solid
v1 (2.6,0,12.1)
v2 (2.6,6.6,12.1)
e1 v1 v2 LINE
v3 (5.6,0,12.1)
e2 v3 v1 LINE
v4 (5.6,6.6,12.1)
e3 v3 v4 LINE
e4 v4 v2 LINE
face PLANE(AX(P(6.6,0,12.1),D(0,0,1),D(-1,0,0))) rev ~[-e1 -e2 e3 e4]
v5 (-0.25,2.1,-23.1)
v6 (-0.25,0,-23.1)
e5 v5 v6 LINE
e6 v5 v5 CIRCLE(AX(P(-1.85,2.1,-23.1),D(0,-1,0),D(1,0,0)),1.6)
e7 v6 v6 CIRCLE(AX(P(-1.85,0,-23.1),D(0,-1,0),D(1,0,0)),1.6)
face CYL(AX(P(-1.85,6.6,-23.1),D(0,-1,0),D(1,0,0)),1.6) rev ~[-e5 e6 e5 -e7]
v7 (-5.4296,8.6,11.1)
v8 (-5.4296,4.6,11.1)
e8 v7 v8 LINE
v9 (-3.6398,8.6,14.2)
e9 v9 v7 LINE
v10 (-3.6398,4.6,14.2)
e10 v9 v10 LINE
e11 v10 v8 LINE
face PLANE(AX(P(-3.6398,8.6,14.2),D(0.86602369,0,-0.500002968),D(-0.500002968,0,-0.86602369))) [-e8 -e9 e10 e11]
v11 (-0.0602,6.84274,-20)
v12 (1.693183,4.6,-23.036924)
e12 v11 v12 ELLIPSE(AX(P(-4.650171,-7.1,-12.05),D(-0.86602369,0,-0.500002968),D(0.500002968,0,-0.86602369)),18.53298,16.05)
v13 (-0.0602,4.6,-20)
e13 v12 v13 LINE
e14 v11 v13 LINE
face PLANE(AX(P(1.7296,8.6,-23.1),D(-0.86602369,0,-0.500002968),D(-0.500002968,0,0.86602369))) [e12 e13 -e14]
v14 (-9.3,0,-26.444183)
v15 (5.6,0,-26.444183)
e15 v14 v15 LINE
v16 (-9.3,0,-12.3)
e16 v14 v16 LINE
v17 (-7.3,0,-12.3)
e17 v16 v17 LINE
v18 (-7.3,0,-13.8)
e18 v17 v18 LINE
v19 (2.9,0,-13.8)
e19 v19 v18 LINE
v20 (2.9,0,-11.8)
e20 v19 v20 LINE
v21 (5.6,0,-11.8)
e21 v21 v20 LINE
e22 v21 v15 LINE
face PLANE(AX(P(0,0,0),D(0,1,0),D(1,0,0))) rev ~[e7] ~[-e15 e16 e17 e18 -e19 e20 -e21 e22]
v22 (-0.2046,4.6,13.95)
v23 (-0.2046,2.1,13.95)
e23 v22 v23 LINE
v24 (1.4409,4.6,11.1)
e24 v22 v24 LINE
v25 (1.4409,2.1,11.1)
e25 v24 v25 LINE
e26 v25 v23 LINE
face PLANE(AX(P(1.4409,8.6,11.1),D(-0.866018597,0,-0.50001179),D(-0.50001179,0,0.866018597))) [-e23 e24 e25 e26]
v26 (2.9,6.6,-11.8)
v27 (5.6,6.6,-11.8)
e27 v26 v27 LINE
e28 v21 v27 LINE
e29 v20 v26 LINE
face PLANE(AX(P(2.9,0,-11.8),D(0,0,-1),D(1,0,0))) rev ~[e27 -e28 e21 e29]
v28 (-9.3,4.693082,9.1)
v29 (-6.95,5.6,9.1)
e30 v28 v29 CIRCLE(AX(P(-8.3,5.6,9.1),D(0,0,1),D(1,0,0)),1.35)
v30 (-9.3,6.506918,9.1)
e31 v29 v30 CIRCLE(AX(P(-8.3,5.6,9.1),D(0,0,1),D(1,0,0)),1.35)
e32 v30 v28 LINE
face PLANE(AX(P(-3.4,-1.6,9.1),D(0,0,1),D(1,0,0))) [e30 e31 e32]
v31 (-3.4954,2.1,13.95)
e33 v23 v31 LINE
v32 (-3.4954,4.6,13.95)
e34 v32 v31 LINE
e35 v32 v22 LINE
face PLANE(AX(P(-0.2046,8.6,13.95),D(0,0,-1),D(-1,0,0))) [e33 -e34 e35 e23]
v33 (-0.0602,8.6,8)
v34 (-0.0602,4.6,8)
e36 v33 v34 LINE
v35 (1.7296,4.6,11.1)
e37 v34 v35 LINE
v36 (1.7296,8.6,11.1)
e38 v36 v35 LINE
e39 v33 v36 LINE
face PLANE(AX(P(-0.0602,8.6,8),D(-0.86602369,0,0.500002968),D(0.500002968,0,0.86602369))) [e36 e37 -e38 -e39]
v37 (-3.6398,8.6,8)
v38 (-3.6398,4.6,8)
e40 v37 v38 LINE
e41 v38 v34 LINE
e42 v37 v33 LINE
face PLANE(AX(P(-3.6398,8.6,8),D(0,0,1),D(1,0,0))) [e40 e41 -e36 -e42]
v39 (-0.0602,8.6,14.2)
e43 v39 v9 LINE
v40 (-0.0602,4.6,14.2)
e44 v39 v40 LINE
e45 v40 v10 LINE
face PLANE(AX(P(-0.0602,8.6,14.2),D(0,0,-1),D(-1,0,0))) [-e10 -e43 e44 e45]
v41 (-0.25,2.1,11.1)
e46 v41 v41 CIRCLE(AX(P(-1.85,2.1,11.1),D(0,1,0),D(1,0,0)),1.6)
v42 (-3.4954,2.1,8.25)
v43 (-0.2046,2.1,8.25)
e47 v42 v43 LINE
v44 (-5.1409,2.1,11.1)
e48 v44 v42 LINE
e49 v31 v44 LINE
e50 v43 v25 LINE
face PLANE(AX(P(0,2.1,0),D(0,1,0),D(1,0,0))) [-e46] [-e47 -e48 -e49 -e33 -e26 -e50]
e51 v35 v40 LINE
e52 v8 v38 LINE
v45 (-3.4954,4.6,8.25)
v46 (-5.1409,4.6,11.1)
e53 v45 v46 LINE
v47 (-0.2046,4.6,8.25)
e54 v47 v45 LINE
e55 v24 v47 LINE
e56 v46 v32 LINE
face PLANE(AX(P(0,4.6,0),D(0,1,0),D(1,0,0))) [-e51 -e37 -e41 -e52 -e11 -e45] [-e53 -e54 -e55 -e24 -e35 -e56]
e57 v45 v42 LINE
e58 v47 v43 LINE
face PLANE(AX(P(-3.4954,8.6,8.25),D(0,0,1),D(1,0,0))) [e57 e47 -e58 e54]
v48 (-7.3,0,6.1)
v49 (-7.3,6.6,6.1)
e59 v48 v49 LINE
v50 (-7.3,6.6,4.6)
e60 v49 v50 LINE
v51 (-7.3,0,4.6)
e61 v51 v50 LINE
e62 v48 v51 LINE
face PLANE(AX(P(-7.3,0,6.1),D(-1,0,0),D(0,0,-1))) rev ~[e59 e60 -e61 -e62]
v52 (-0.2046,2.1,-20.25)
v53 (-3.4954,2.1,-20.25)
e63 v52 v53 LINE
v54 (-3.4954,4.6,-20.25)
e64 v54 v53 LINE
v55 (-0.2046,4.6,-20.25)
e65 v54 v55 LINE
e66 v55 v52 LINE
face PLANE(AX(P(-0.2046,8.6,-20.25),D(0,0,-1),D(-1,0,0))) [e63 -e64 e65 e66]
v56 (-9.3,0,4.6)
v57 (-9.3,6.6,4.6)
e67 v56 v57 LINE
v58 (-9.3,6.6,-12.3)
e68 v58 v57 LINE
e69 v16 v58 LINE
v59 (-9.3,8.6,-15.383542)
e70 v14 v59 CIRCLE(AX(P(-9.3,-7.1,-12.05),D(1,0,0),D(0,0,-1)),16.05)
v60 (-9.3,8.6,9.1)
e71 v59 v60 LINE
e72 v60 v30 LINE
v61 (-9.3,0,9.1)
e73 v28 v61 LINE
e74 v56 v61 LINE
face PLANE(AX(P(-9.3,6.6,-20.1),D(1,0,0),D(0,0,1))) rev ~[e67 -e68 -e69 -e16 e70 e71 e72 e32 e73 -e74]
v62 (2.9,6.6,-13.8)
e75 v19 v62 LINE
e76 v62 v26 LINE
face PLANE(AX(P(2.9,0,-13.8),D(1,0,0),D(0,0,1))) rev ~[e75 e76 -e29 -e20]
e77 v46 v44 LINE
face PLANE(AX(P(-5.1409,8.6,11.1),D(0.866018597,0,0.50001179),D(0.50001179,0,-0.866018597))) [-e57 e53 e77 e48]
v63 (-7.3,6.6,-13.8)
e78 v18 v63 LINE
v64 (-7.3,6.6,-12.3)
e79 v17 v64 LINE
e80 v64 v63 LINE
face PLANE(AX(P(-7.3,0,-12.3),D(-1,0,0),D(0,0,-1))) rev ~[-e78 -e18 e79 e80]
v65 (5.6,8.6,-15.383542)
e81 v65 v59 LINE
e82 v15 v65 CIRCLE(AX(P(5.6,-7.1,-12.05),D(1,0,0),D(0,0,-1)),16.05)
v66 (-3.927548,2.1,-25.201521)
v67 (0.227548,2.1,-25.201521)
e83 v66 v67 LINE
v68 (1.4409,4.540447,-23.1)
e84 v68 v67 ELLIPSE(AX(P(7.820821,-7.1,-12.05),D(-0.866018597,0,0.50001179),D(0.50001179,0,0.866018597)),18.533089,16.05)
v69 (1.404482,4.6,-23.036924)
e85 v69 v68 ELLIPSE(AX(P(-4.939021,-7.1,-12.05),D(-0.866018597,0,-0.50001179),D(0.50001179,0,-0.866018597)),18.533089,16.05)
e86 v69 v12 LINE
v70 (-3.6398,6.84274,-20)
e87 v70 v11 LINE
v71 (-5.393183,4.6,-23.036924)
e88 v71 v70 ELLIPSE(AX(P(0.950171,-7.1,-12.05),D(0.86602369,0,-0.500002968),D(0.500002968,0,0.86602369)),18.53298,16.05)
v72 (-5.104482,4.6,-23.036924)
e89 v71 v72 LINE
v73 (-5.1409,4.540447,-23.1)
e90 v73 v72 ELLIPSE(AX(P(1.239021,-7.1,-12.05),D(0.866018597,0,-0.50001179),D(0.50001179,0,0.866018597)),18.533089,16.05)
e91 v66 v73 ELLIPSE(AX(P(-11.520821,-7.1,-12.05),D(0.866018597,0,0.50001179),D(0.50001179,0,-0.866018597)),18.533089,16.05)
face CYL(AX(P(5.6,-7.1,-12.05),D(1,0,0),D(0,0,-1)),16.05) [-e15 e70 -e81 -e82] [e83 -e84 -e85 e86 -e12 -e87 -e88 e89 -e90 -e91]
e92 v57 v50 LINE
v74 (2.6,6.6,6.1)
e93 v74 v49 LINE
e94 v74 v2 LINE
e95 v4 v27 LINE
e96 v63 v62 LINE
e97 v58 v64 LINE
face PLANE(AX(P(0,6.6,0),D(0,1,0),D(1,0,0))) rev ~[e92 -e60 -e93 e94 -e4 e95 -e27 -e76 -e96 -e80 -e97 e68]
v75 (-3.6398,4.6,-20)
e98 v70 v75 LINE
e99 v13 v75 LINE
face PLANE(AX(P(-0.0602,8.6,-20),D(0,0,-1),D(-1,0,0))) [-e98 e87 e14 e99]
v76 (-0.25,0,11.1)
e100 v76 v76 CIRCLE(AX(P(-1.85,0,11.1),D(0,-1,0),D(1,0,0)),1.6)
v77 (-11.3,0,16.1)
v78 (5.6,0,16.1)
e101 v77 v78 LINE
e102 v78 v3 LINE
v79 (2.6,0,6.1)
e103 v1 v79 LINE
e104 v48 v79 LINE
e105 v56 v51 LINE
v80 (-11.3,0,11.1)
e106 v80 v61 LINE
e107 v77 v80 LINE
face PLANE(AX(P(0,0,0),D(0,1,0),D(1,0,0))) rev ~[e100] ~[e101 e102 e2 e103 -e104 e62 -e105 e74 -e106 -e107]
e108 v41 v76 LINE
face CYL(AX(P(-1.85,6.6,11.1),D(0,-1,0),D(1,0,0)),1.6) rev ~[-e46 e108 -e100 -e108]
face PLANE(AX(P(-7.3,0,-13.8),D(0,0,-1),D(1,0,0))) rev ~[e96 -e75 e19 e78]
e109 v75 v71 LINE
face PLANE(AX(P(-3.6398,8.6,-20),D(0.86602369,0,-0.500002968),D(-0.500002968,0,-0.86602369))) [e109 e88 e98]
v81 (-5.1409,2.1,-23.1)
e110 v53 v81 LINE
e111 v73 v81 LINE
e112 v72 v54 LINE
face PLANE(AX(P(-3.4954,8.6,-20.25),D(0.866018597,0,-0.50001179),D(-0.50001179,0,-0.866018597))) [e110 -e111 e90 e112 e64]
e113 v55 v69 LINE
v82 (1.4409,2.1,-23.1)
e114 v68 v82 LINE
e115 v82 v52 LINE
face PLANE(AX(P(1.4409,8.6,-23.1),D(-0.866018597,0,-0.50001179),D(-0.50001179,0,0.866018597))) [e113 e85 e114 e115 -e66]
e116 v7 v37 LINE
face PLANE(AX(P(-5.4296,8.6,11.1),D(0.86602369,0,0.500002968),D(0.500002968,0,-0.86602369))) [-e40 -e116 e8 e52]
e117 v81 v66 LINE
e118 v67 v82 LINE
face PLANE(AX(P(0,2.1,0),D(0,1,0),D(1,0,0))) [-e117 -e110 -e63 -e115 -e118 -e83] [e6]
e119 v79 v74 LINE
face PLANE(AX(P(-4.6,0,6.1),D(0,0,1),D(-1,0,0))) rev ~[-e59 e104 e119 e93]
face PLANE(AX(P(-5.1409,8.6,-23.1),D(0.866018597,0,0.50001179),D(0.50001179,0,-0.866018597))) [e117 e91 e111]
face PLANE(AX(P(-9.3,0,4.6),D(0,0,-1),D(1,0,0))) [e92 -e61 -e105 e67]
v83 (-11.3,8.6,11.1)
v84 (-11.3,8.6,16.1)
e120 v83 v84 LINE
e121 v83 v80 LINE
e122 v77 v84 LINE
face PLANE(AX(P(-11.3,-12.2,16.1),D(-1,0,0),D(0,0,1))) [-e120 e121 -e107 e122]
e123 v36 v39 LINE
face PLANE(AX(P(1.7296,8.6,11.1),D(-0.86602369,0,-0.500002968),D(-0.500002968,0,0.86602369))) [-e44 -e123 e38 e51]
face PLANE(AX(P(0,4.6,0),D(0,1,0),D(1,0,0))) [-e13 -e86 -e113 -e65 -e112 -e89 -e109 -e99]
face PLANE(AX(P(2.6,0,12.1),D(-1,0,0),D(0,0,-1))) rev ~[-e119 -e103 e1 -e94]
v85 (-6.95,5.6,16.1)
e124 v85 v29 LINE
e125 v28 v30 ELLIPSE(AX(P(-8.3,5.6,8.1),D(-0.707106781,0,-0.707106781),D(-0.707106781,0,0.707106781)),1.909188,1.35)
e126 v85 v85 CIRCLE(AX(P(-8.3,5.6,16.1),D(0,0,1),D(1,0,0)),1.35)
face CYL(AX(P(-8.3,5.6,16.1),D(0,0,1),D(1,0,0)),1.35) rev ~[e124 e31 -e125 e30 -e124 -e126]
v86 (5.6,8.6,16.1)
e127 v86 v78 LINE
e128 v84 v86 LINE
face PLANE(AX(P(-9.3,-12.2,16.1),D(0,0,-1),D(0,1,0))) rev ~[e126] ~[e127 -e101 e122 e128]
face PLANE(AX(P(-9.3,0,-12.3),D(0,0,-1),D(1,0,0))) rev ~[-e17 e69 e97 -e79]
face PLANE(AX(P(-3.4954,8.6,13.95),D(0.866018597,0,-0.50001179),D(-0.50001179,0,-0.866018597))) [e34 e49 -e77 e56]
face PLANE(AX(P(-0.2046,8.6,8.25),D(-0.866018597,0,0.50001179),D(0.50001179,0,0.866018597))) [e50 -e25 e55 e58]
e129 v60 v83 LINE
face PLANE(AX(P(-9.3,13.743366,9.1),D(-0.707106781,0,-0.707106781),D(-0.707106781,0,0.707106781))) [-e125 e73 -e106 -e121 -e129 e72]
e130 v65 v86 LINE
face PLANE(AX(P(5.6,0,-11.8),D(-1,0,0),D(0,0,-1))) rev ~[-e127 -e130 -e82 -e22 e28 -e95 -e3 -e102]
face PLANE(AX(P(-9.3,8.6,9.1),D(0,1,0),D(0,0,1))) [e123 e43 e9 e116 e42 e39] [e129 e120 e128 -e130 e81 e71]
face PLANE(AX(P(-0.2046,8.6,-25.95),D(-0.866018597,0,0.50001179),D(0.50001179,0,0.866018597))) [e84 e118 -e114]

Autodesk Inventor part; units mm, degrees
ref_plane "YZ Plane" through (0, 0, 0) normal (1, 0, 0) x (0, 1, 0)
ref_plane "XZ Plane" through (0, 0, 0) normal (0, 1, 0) x (-1, 0, 0)
sketch "スケッチ1" plane through (0, 0, 0) normal (0, 1, 0) x (-1, 0, 0)
  line L0 (4.5, 6) -> (-4.5, 6) construction
  line L1 (-4.5, 6) -> (-4.5, -18) construction
  line L2 (-4.5, -18) -> (4.5, -18) construction
  line L3 (4.5, -18) -> (4.5, 6) construction
  line L4 (4.5, -6) -> (-4.5, -6)
  line L5 (0, -25.74) -> (0, 13.74) projected
  line L6 (0.5, -18) -> (0.5, -6) construction
  line L7 (4.6, -18.1) -> (-4.6, -18.1)
  line L8 (-4.6, -18.1) -> (-4.6, 6.1)
  line L9 (-4.6, 6.1) -> (4.6, 6.1)
  line L10 (4.6, 6.1) -> (4.6, -18.1)
  line L11 (0.4, -18.1) -> (0.4, -6)
  line L12 (-4.5, -6) -> (-4.6, -6)
  line L13 (4.5, -6) -> (4.6, -6)
  line L14 (6.6, -20.1) -> (-6.6, -20.1)
  line L15 (-6.6, -20.1) -> (-6.6, 8.1)
  line L16 (-6.6, 8.1) -> (6.6, 8.1)
  line L17 (6.6, 8.1) -> (6.6, -20.1)
  line L18 (0.4, -18.1) -> (-14.8, -18.1)
  line L19 (-14.8, -18.1) -> (-14.8, -6)
  line L20 (-14.8, -6) -> (0.4, -6)
  line L21 (0.4, -6) -> (0.4, -18.1)
  line L22 (-6.6, -20.1) -> (-14.8, -20.1)
  line L23 (-14.8, -20.1) -> (-14.8, -18.1)
  point P0 (0, 0)
  point P1 (0, -6)
  point P2 (-6.6, -6)
  point P3 (0, -20.1)
  point P4 (-6.6, -6)
  dimension "d0" = 6
  dimension "d1" = 12
  dimension "d2" = 12
  dimension "d3" = 9
  dimension "d4" = 4
  dimension "d5" = 0.1
  dimension "d6" = 0.1
  dimension "d7" = 0.1
  dimension "d8" = 0.1
  dimension "d9" = 0.1
  dimension "d10" = 2
  dimension "d11" = 2
  dimension "d12" = 15.2
extrude "押し出し1" add sketch "スケッチ1" against normal blind 2
extrude "押し出し2" add sketch "スケッチ1" against normal blind 12.2 contours L13 L10 L7 L11 L4 | L11 L7 L5 L4 | L10 L9 L5 L16 L17 L14 L7 | L5 L7 L8 L12 L4 | L5 L14 L15 L18 L7 | L9 L8 L20 L15 L16 L5 | L8 L18 L15 L20 | L15 L18 L19 L20 | L22 L23 L18 L15
sketch "スケッチ2" plane through (14.8, 0, -6) normal (1, 0, 0) x (0, 0, -1)
  line L0 (0, 0) -> (0, -12.2) projected
  line L1 (0, -2) -> (14.1, -2)
  line L2 (14.1, 0) -> (14.1, -12.2) projected
  line L3 (0, 0) -> (14.1, 0) projected
  circle A0 centre (6.05, -7.1) radius 6.05
  line L4 (0, 0) -> (0, -12.2) projected
  line L5 (0, 0) -> (14.1, 0) projected
  line L6 (0, 0) -> (0, -12.2) projected
  line L7 (14.1, -12.2) -> (0, -12.2) projected
  line L8 (14.1, 0) -> (14.1, -12.2) projected
  line L9 (12.1, 0) -> (12.1, -12.2)
  point P0 (-6, 0)
  point P1 (14.1, -7.1)
  point P2 (9.3046, -2)
  point P3 (2.7954, -2)
  point P4 (0, -7.1)
  point P5 (2.7954, -12.2)
  point P6 (9.3046, -12.2)
  point P7 (0, -7.1)
  point P8 (12.1, -7.1)
  dimension "d17" = 2
  dimension "d18" = 5.1
  dimension "d21" = 2
extrude "押し出し3" cut sketch "スケッチ2" against normal blind 15.2 contours A0 L7 L0 | A0 L1 L7 | L9 L7 A0
sketch "スケッチ3" plane through (6.6, 0, 8.1) normal (1, 0, 0) x (0, 0, -1)
  circle A0 centre (8.1, -7.1) radius 3
  line L0 (14.1, -12.2) -> (0, -12.2) projected
  line L1 (5.1, -12.2) -> (11.1, -12.2)
  line L2 (11.1, -12.2) -> (11.1, -7.1)
  line L3 (11.1, -7.1) -> (5.1, -7.1)
  line L4 (5.1, -7.1) -> (5.1, -12.2)
  point P0 (8.1, 0)
  dimension "d22" = 6
  dimension "d23" = 7.1
extrude "押し出し4" cut sketch "スケッチ3" against normal up to surface (2 mm away)
fillet "フィレット1" radius 0.5 2 edges at (10.7, -7.1, -6) (2.1, -7.1, -6)
sketch "スケッチ4" plane through (-0.4, 0, -6) normal (1, 0, 0) x (0, 0, -1)
  line L0 (-14.1, -12.2) -> (14.1, -12.2) projected
  line L1 (0, -12.2) -> (12.1, -12.2)
  line L2 (12.1, -12.2) -> (12.1, -2)
  line L3 (12.1, -2) -> (0, -2)
  line L4 (0, -2) -> (0, -12.2)
  line L5 (12.1, -7.1) -> (12.1, -12.2) projected
  line L6 (2.7954, -2) -> (9.3046, -2) projected
  point P0 (-6, 0)
extrude "押し出し5" cut sketch "スケッチ4" against normal up to surface (4.2 mm away)
ref_plane "作業平面1" through (-3.6, -12.2, 6.1) normal (1, 0, 0) x (0, 0, -1)
sketch "スケッチ5" plane through (-3.6, -12.2, 6.1) normal (1, 0, 0) x (0, 0, -1)
  line L0 (0, 10.2) -> (7.1, 10.2)
  line L1 (7.1, 10.2) -> (7.1, 5.2)
  line L2 (7.1, 5.2) -> (0, 5.2)
  line L3 (0, 5.2) -> (0, 10.2)
  line L4 (9.1, 0) -> (9.1, 5.1) projected
  point P0 (6.1, 12.2)
  dimension "d30" = 5
  dimension "d34" = 2
extrude "押し出し6" add sketch "スケッチ5" along normal blind 1.5
fillet "フィレット2" radius 3 2 edges at (-2.85, -7, -1) (-2.85, -7, 6.1)
sketch "スケッチ6" plane through (0, 0, 0) normal (0, 1, 0) x (1, 0, 0)
  line L0 (-6.6, -8.1) -> (6.6, -8.1) projected
  line L1 (5.6, -8.1) -> (2.6, -8.1)
  line L2 (2.6, -8.1) -> (2.6, -0.1)
  line L3 (2.6, -0.1) -> (5.6, -0.1)
  line L4 (5.6, -0.1) -> (5.6, -8.1)
  line L5 (6.6, -8.1) -> (6.6, 6) projected
  line L6 (-9.3, -8.1) -> (-7.3, -8.1)
  line L7 (-7.3, -8.1) -> (-7.3, 13.8)
  line L8 (-7.3, 13.8) -> (-9.3, 13.8)
  line L9 (-9.3, 13.8) -> (-9.3, -8.1)
  line L10 (-4.6, -6.1) -> (4.6, -6.1) projected
  line L11 (-7.3, -8.1) -> (2.6, -8.1)
  line L12 (2.6, -8.1) -> (2.6, -6.1)
  line L13 (2.6, -6.1) -> (-7.3, -6.1)
  line L14 (-7.3, -6.1) -> (-7.3, -8.1)
  line L15 (-9.3, 13.8) -> (2.9, 13.8)
  line L16 (2.9, 13.8) -> (2.9, 15.8)
  line L17 (2.9, 15.8) -> (-9.3, 15.8)
  line L18 (-9.3, 15.8) -> (-9.3, 13.8)
  line L19 (-9.3, 12.3) -> (-7.3, 12.3)
  line L20 (-9.3, -4.6) -> (-7.3, -4.6)
  line L21 (-7.3, -1.4667) -> (-9.3, -1.4667)
  line L22 (-9.3, -1.4667) -> (-9.3, 1.5333)
  line L23 (-9.3, 1.5333) -> (-7.3, 1.5333)
  line L24 (-7.3, 1.5333) -> (-7.3, -1.4667)
  line L25 (-7.3, 6.1667) -> (-9.3, 6.1667)
  line L26 (-9.3, 6.1667) -> (-9.3, 9.1667)
  line L27 (-9.3, 9.1667) -> (-7.3, 9.1667)
  line L28 (-7.3, 9.1667) -> (-7.3, 6.1667)
  circle A0 centre (-4.5, 8.6) radius 1
  circle A1 centre (-4.5, -0.9) radius 1
  line L29 (-9.3, 3.85) -> (-0.8107, 3.85)
  line L30 (2.9, 15.8) -> (-9.3, 15.8)
  line L31 (-9.3, 15.8) -> (-9.3, 20.1)
  line L32 (-9.3, 20.1) -> (2.9, 20.1)
  line L33 (2.9, 20.1) -> (2.9, 15.8)
  line L34 (14.8, 20.1) -> (-6.6, 20.1) projected
  point P0 (0, 0)
  point P1 (-9.3, 6.1667)
  point P2 (-7.3, 3.85)
  point P3 (2.6, -8.1)
  point P4 (2.6, -8.1)
  dimension "d35" = 4
  dimension "d36" = 8
  dimension "d37" = 3
  dimension "d40" = 9.9
  dimension "d41" = 2
  dimension "d42" = 19.9
  dimension "d43" = 2
  dimension "d44" = 10.2
  dimension "d45" = 1.5
  dimension "d46" = 1.5
  dimension "d53" = 3
  dimension "d54" = 3
  dimension "d55" = 4.6333
  dimension "d56" = 4.6333
  dimension "d57" = 4.6333
  dimension "d60" = 2
  dimension "d61" = 2
  dimension "d62" = 7.1
  dimension "d63" = 9.5
extrude "押し出し7" add sketch "スケッチ6" along normal blind 6.6 contours L11 L7 L13 L10 L2 L0 | L2 L3 L4 L0 | L6 L9 L20 L7 | L9 L23 L7 L21 | L9 L27 L7 L25 | L9 L8 L7 L19 | L18 L17 L16 L15 L8 | L31 L32 L33 L17 | A0 | A1
chamfer "面取り1" distance 6 distance2 2 1 edges at (5.6, 3.3, 0.1) measured on face at (5.6, 2.2, 5.4333)
sketch "スケッチ7" plane through (-6.6, -12.2, -20.1) normal (-1, 0, 0) x (0, 0, 1)
  line L0 (0, 12.2) -> (0, 0) projected
  line L1 (28.2, 0) -> (0, 0) projected
  line L2 (28.2, 12.2) -> (28.2, 0) projected
  line L3 (26.2, 12.2) -> (28.2, 12.2) projected
  line L4 (6.3, 12.2) -> (26.2, 12.2) projected
  line L5 (0, 12.2) -> (6.3, 12.2) projected
  point P0 (20.1, 12.2)
extrude "押し出し8" add sketch "スケッチ7" along normal up to surface (2.7 mm away)
sketch "スケッチ8" plane through (0, 6.6, 0) normal (0, 1, 0) x (1, 0, 0)
  line L0 (14.8, 20.1) -> (-9.3, 20.1) projected
  line L1 (-9.3, -8.1) -> (5.6, -8.1)
  line L2 (5.6, -8.1) -> (5.6, 20.1)
  line L3 (5.6, 20.1) -> (-9.3, 20.1)
  line L4 (-9.3, 20.1) -> (-9.3, -8.1)
  line L5 (5.6, -8.1) -> (5.6, -6.1) projected
  circle A0 centre (-1.85, 23.1) radius 1.6
  circle A1 centre (-1.85, -11.1) radius 1.6
  line L6 (5.6, 6) -> (-9.3, 6)
  line L7 (-9.3, -8.1) -> (5.6, -8.1)
  line L8 (5.6, -8.1) -> (5.6, -16.1)
  line L9 (5.6, -16.1) -> (-9.3, -16.1)
  line L10 (-9.3, -16.1) -> (-9.3, -8.1)
  line L11 (-9.3, 20.1) -> (5.6, 20.1)
  line L12 (5.6, 20.1) -> (5.6, 28.1)
  line L13 (5.6, 28.1) -> (-9.3, 28.1)
  line L14 (-9.3, 28.1) -> (-9.3, 20.1)
  line L15 (-9.3, 20.1) -> (-9.3, -8.1) projected
  line L16 (-9.3, -8.1) -> (5.6, -8.1) projected
  point P0 (0, 0)
  point P1 (-1.85, 20.1)
  dimension "d64" = 3.2
  dimension "d65" = 3.2
  dimension "d66" = 3
  dimension "d67" = 8
extrude "押し出し9" add sketch "スケッチ8" along normal blind 2
extrude "押し出し10" add sketch "スケッチ8" against normal up to surface (18.8 mm away) contours L0 L14 L13 L12 | L1 L8 L9 L10
sketch "スケッチ9" plane through (0, 8.6, 0) normal (0, 1, 0) x (1, 0, 0)
  circle A0 centre (-1.85, -11.1) radius 1.6 projected
  circle A1 centre (-1.85, 23.1) radius 1.6 projected
  line L0 (1.4409, -11.1) -> (-0.2046, -13.95)
  line L1 (-0.2046, -13.95) -> (-3.4954, -13.95)
  line L2 (-3.4954, -13.95) -> (-5.1409, -11.1)
  line L3 (-5.1409, -11.1) -> (-3.4954, -8.25)
  line L4 (-3.4954, -8.25) -> (-0.2046, -8.25)
  line L5 (-0.2046, -8.25) -> (1.4409, -11.1)
  line L6 (-0.2046, 25.95) -> (1.4409, 23.1)
  line L7 (1.4409, 23.1) -> (-0.2046, 20.25)
  line L8 (-0.2046, 20.25) -> (-3.4954, 20.25)
  line L9 (-3.4954, 20.25) -> (-5.1409, 23.1)
  line L10 (-5.1409, 23.1) -> (-3.4954, 25.95)
  line L11 (-3.4954, 25.95) -> (-0.2046, 25.95)
  point P0 (0, 0)
  dimension "d72" = 5.7
extrude "押し出し11" cut sketch "スケッチ9" against normal blind 6.5 contours A0 | A1 | L0 L1 L2 L3 L4 L5 | L6 L7 L8 L9 L10 L11
sketch "スケッチ10" plane through (0, 8.6, 0) normal (0, 1, 0) x (1, 0, 0)
  circle A0 centre (-1.85, -11.1) radius 1.6 projected
  circle A1 centre (-1.85, 23.1) radius 1.6 projected
  line L0 (-3.6398, -8) -> (-0.0602, -8)
  line L1 (-0.0602, -8) -> (1.7296, -11.1)
  line L2 (1.7296, -11.1) -> (-0.0602, -14.2)
  line L3 (-0.0602, -14.2) -> (-3.6398, -14.2)
  line L4 (-3.6398, -14.2) -> (-5.4296, -11.1)
  line L5 (-5.4296, -11.1) -> (-3.6398, -8)
  line L6 (-3.6398, 26.2) -> (-0.0602, 26.2)
  line L7 (-0.0602, 26.2) -> (1.7296, 23.1)
  line L8 (1.7296, 23.1) -> (-0.0602, 20)
  line L9 (-0.0602, 20) -> (-3.6398, 20)
  line L10 (-3.6398, 20) -> (-5.4296, 23.1)
  line L11 (-5.4296, 23.1) -> (-3.6398, 26.2)
  line L12 (-0.2046, -13.95) -> (-3.4954, -13.95) projected
  line L13 (-0.2046, 20.25) -> (-3.4954, 20.25) projected
  point P0 (0, 0)
  dimension "d75" = 6.2
extrude "押し出し12" cut sketch "スケッチ10" against normal blind 4 contours A0 | A1 | L0 L1 L2 L3 L4 L5 | L6 L7 L8 L9 L10 L11
sketch "スケッチ11" plane through (14.8, 0, -6) normal (1, 0, 0) x (0, 0, -1)
  arc A0 (0, -3.6215) -> (0.9237, -3.887) centre (0.5, -3.6215) ccw projected
  arc A1 (2.7954, -2) -> (0.9237, -3.887) centre (6.05, -7.1) ccw projected
  line L0 (2.7954, -2) -> (9.3046, -2) projected
  arc A2 (12.1, -7.1) -> (9.3046, -2) centre (6.05, -7.1) ccw projected
  line L1 (12.1, -7.1) -> (12.1, -12.2) projected
  line L2 (14.1, -12.2) -> (12.1, -12.2) projected
  line L3 (14.1, 0) -> (14.1, -12.2) projected
  line L4 (0, 0) -> (14.1, 0) projected
  line L5 (0, 0) -> (0, -3.6215) projected
  line L6 (9.3046, -2) -> (14.1, -2)
  point P0 (-6, 0)
extrude "押し出し13" add sketch "スケッチ11" along normal blind 5 contours L5 L4 L3 L6 L0 A1 A0
sketch "スケッチ12" plane through (19.8, 0, -6) normal (1, 0, 0) x (0, 0, -1)
  line L0 (0, -7.1) -> (0, -12.2) projected
  line L1 (14.1, 0) -> (0, 0) projected
  line L2 (14.1, -2) -> (14.1, -12.2) projected
  line L3 (14.1, -12.2) -> (0, -12.2)
  line L4 (0, -12.2) -> (0, 0)
  line L5 (0, 0) -> (14.1, 0)
  line L6 (14.1, 0) -> (14.1, -12.2)
  point P0 (-6, 0)
extrude "押し出し14" add sketch "スケッチ12" along normal blind 2
sketch "スケッチ13" plane through (14.8, -12.2, -20.1) normal (0, 0, -1) x (-1, 0, 0)
  line L0 (8.2, 12.2) -> (-7, 12.2) projected
  line L1 (-7, 12.2) -> (-13, 12.2)
  line L2 (-13, 12.2) -> (-13, 0)
  line L3 (-13, 0) -> (-7, 0)
  line L4 (-7, 0) -> (-7, 12.2)
  circle A0 centre (-10, 3) radius 1.6
  line L5 (-5, 0) -> (-7, 0) projected
  point P0 (14.8, 12.2)
  dimension "d98" = 3.2
  dimension "d99" = 3
  dimension "d100" = 3
  dimension "d101" = 6
extrude "押し出し15" add sketch "スケッチ13" against normal up to surface (14.1 mm away)
sketch "スケッチ14" plane through (19.8, -12.2, -20.1) normal (0, -1, 0) x (1, 0, 0)
  line L0 (8, 0) -> (8, 14.1) projected
  line L1 (8, 4.55) -> (2, 4.55)
  line L2 (2, 4.55) -> (2, 9.55)
  line L3 (2, 9.55) -> (8, 9.55)
  line L4 (8, 9.55) -> (8, 4.55)
  line L5 (0, 14.1) -> (0, 0) projected
  point P0 (-19.8, 20.1)
  point P1 (2, 7.05)
  point P2 (0, 7.05)
  point P3 (8, 9.55)
  dimension "d104" = 2
  dimension "d105" = 5
extrude "押し出し16" cut sketch "スケッチ14" against normal through all
sketch "スケッチ15" plane through (14.8, -12.2, -20.1) normal (0, 0, -1) x (-1, 0, 0)
  circle A0 centre (-10, 3) radius 1.6 projected
  line L0 (-11.7321, 0) -> (-13.4641, 3)
  line L1 (-13.4641, 3) -> (-11.7321, 6)
  line L2 (-11.7321, 6) -> (-8.2679, 6)
  line L3 (-8.2679, 6) -> (-6.5359, 3)
  line L4 (-6.5359, 3) -> (-8.2679, 0)
  line L5 (-8.2679, 0) -> (-11.7321, 0)
  line L6 (-5, 0) -> (-13, 0) projected
  line L7 (-13, 12.2) -> (-13, 0) projected
  point P0 (14.8, 12.2)
  point P1 (-13, 3.8038)
  point P2 (-11.7321, 0)
extrude "押し出し17" cut sketch "スケッチ15" against normal blind 2 contours A0 | L6 L7 L0 | L0 L7 L1 L2 L3 L4 L5
sketch "スケッチ16" plane through (6.6, -3.6215, -6) normal (0, 0, 1) x (1, 0, 0)
  circle A0 centre (18.2, -5.5785) radius 1.6 projected
  circle A1 centre (18.2, -5.5785) radius 3
  circle A2 centre (18.2, -5.5785) radius 1.6 projected
  line L0 (13.2, 0) -> (0, 0) projected
  line L1 (13.2, 0) -> (13.2, -8.5785) projected
  line L2 (13.2, -8.5785) -> (21.2, -8.5785) projected
  line L3 (21.2, 3.6215) -> (21.2, -8.5785) projected
  line L4 (0, 3.6215) -> (21.2, 3.6215) projected
  line L5 (0, 3.6215) -> (0, 0) projected
  point P0 (-6.6, 3.6215)
  point P1 (21.2, -5.5785)
  point P2 (18.2, -8.5785)
extrude "押し出し18" cut sketch "スケッチ16" against normal blind 2.5 contours A1 | L3 L2 A1
fillet "フィレット3" radius 1 2 edges at (24.8, -12.2, -7.25) (27.8, -9.2, -7.25)
sketch "スケッチ17" plane through (0, 0, 0) normal (0, 1, 0) x (1, 0, 0)
  circle A0 centre (-4.5, 8.6) radius 1 projected
  circle A1 centre (-4.5, -0.9) radius 1 projected
  line L0 (27.8, 10.55) -> (21.8, 10.55) projected
  line L1 (21.8, 10.55) -> (21.8, 15.55) projected
  line L2 (21.8, 15.55) -> (27.8, 15.55) projected
  line L3 (27.8, 20.1) -> (27.8, 15.55) projected
  line L4 (27.8, 20.1) -> (5.6, 20.1) projected
  line L5 (5.6, 20.1) -> (2.9, 20.1) projected
  line L6 (-7.3, 13.8) -> (2.9, 13.8) projected
  line L7 (-7.3, 12.3) -> (-7.3, 13.8) projected
  line L8 (-7.3, -6.1) -> (2.6, -6.1) projected
  line L9 (2.6, -6.1) -> (2.6, -0.1) projected
  line L10 (2.6, -0.1) -> (3.6, -0.1) projected
  line L11 (5.6, -6.1) -> (3.6, -0.1) projected
  line L12 (5.6, -6.1) -> (5.6, -8.1) projected
  line L13 (5.6, -8.1) -> (6.6, -8.1) projected
  line L14 (6.6, -8.1) -> (6.6, 6) projected
  line L15 (6.6, 6) -> (27.8, 6) projected
  line L16 (27.8, 10.55) -> (27.8, 6) projected
  line L17 (2.6, -6.1) -> (2.6, -0.1) projected
  line L18 (2.6, -0.1) -> (6.6, -0.1)
  line L19 (6.6, -0.1) -> (6.6, -12.1)
  line L20 (6.6, -12.1) -> (2.6, -12.1)
  line L21 (2.6, -12.1) -> (2.6, -0.1)
  line L22 (6.6, -8.1) -> (6.6, 6) projected
  line L23 (2.9, 20.1) -> (2.9, 13.8) projected
  line L24 (-9.3, 12.3) -> (-7.3, 12.3) projected
  line L25 (-9.3, 12.3) -> (-9.3, 9.1667) projected
  line L26 (-7.3, 9.1667) -> (-9.3, 9.1667) projected
  line L27 (-7.3, 6.1667) -> (-7.3, 9.1667) projected
  line L28 (-9.3, 6.1667) -> (-7.3, 6.1667) projected
  line L29 (-9.3, 6.1667) -> (-9.3, 1.5333) projected
  line L30 (-7.3, 1.5333) -> (-9.3, 1.5333) projected
  line L31 (-7.3, -1.4667) -> (-7.3, 1.5333) projected
  line L32 (-9.3, -1.4667) -> (-7.3, -1.4667) projected
  line L33 (-9.3, -1.4667) -> (-9.3, -4.6) projected
  line L34 (-7.3, -4.6) -> (-9.3, -4.6) projected
  line L35 (-7.3, -6.1) -> (-7.3, -4.6) projected
  point P0 (0, 0)
  dimension "d116" = 12
extrude "押し出し19" cut sketch "スケッチ17" along normal up to surface (6.6 mm away) contours L14 L13 L12 L11 L18 | L19 L20 L21 L9 L10 L11 L12 L13
sketch "スケッチ18" plane through (0, 0, 0) normal (0, 1, 0) x (1, 0, 0)
  line L0 (2.9, 11.8) -> (5.6, 11.8)
  line L1 (5.6, 11.8) -> (5.6, 20.1)
  line L2 (5.6, 20.1) -> (2.9, 20.1)
  line L3 (2.9, 20.1) -> (2.9, 11.8)
  line L4 (5.6, 20.1) -> (2.9, 20.1) projected
  line L5 (5.6, -12.1) -> (5.6, 20.1) projected
  line L6 (2.9, 20.1) -> (2.9, 13.8) projected
  line L7 (-7.3, 13.8) -> (2.9, 13.8) projected
  point P0 (0, 0)
  dimension "d122" = 2
extrude "押し出し20" add sketch "スケッチ18" along normal up to surface (6.6 mm away)
sketch "スケッチ23" plane through (6.6, 0, 8.1) normal (1, 0, 0) x (0, 0, -1)
  line L0 (11.1, -7.1) -> (11.1, -12.2) projected
  line L1 (14.1, -12.2) -> (11.1, -12.2) projected
  line L2 (14.1, -7.1) -> (14.1, -12.2) projected
  arc A0 (15.0237, -3.887) -> (14.1, -7.1) centre (20.15, -7.1) ccw projected
  arc A1 (14.1, -3.6215) -> (15.0237, -3.887) centre (14.6, -3.6215) ccw projected
  line L3 (14.1, 0) -> (14.1, -3.6215) projected
  line L4 (0, 0) -> (14.1, 0) projected
  line L5 (0, 0) -> (0, -12.2) projected
  line L6 (5.1, -12.2) -> (0, -12.2) projected
  line L7 (5.1, -12.2) -> (5.1, -7.1) projected
  arc A2 (11.1, -7.1) -> (5.1, -7.1) centre (8.1, -7.1) ccw projected
  arc A3 (11.1, -7.1) -> (5.1, -7.1) centre (8.1, -7.1) ccw projected
  circle A4 centre (8.1, -7.1) radius 5.5
  line L8 (8.1, -1.6) -> (-21.9, -1.6)
  line L9 (-21.9, -1.6) -> (-21.9, -12.6)
  line L10 (-21.9, -12.6) -> (8.1, -12.6)
  line L11 (8.1, -12.6) -> (8.1, -1.6)
  line L12 (-8, 8.6) -> (-8, -12.2) projected
  line L13 (-8, -12.2) -> (-8, -12.6)
  line L14 (11.1, -12.2) -> (11.1, -7.1) projected
  arc A5 (11.1, -7.1) -> (5.1, -7.1) centre (8.1, -7.1) ccw projected
  line L15 (5.1, -7.1) -> (5.1, -12.2) projected
  line L16 (2, -12.2) -> (5.1, -12.2) projected
  line L17 (2, -2) -> (2, -12.2) projected
  line L18 (14.1, -2) -> (2, -2) projected
  line L19 (14.1, -2) -> (14.1, -3.6215) projected
  arc A6 (14.1, -3.6215) -> (15.0237, -3.887) centre (14.6, -3.6215) ccw projected
  arc A7 (15.0237, -3.887) -> (14.1, -7.1) centre (20.15, -7.1) ccw projected
  line L20 (14.1, -7.1) -> (14.1, -12.2) projected
  line L21 (11.1, -12.2) -> (14.1, -12.2) projected
  line L22 (2, -2) -> (2, -12.2) projected
  line L23 (2, -12.2) -> (2, -12.6)
  line L24 (2, -2) -> (2, -1.6)
  line L25 (-8, -12.2) -> (0, -12.2) projected
  point P0 (8.1, 0)
  dimension "d138" = 11
  dimension "d139" = 30
extrude "押し出し24" add sketch "スケッチ23" against normal blind 10 contours L10 L9 L8 L12 L13 | L6 L5 L8 L24 L17 | L12 L8 L5 L25
sketch "スケッチ24" plane through (0, -2, 0) normal (0, -1, 0) x (1, 0, 0)
  line L0 (2.9, 5.1) -> (-0.1, 5.1)
  line L1 (-0.1, 5.1) -> (-0.1, -5)
  line L2 (-0.1, -5) -> (2.9, -5)
  line L3 (4.6, -3) -> (4.6, 3) projected
  line L4 (-4.6, 6.1) -> (4.6, 6.1) projected
  line L5 (4.6, -6) -> (-0.4, -6) projected
  line L6 (-2.1, 2) -> (-2.1, -1) projected
  line L7 (-2.1, 6.1) -> (-2.1, -1) projected
  line L8 (-2.1, -1) -> (-3.6, -1) projected
  line L9 (-3.6, -1) -> (-3.6, 6.1) projected
  line L10 (-3.6, 6.1) -> (-4.6, 6.1) projected
  line L11 (-4.6, 6.1) -> (-4.6, -18.1) projected
  line L12 (-0.4, -18.1) -> (-4.6, -18.1) projected
  line L13 (-0.4, -18.1) -> (-0.4, -15.3046) projected
  line L14 (14.8, -15.3046) -> (-0.4, -15.3046) projected
  line L15 (14.8, -20.1) -> (14.8, -15.3046) projected
  line L16 (14.8, -20.1) -> (19.8, -20.1) projected
  line L17 (19.8, -8.7954) -> (19.8, -20.1) projected
  line L18 (19.8, -8.7954) -> (-0.4, -8.7954) projected
  line L19 (-0.4, -8.7954) -> (-0.4, -6) projected
  line L20 (-0.4, -6) -> (4.6, -6) projected
  line L21 (4.6, -6) -> (4.6, 6.1) projected
  line L22 (4.6, 6.1) -> (-2.1, 6.1) projected
  line L23 (14.8, -15.3046) -> (4.6, -15.3046)
  line L24 (4.6, -15.3046) -> (4.6, -8.7954)
  line L25 (4.6, -8.7954) -> (14.8, -8.7954)
  line L26 (14.8, -8.7954) -> (14.8, -15.3046)
  line L27 (4.6, -3) -> (4.6, -6) projected
  line L28 (2.9, 5.1) -> (2.9, -5)
  point P0 (0, 0)
  dimension "d143" = 1
  dimension "d144" = 1
  dimension "d145" = 2
  dimension "d146" = 3
extrude "押し出し25" cut sketch "スケッチ24" against normal up to surface (2 mm away) contours L28 L2 L1 L0 | L18 L26 L14 L24
sketch "スケッチ26" plane through (0, -12.2, 0) normal (0, -1, 0) x (1, 0, 0)
  arc A0 (-3.4, 10.7031) -> (-3.4, 11.4969) centre (-1.85, 11.1) ccw projected
  circle A1 centre (-1.85, 11.1) radius 1.6
  point P0 (0, 0)
extrude "押し出し27" cut sketch "スケッチ26" against normal through all
sketch "スケッチ27" plane through (6.6, -1.6, 30) normal (0, 1, 0) x (1, 0, 0)
  circle A0 centre (-2.5, 3) radius 1.6
  circle A1 centre (-7.5, 3) radius 1.6
  line L0 (-10, 0) -> (-10, 13.9) projected
  line L1 (0, 21.9) -> (0, 0) projected
  line L2 (0, 0) -> (-10, 0) projected
  point P0 (-6.6, 30)
  dimension "d155" = 3.2
  dimension "d156" = 3.2
  dimension "d157" = 2.5
  dimension "d158" = 2.5
  dimension "d159" = 3
extrude "押し出し28" cut sketch "スケッチ27" against normal through all
sketch "スケッチ29" plane through (-9.3, -12.2, 16.1) normal (-1, 0, 0) x (0, 0, 1)
  arc A0 (-31.4046, 10.2) -> (-34.2, 5.1) centre (-28.15, 5.1) ccw projected
  circle A1 centre (-28.15, 5.1) radius 5
  point P0 (-16.1, 12.2)
  dimension "d163" = 10
extrude "押し出し29" cut sketch "スケッチ29" against normal up to surface (4.7 mm away)
sketch "スケッチ30" plane through (5.6, -12.2, -20.1) normal (1, 0, 0) x (0, 0, -1)
  arc A0 (-2, 5.1) -> (-4.7954, 10.2) centre (-8.05, 5.1) ccw projected
  circle A1 centre (-8.05, 5.1) radius 5 projected
  circle A2 centre (-8.05, 5.1) radius 16.05
  line L0 (8, 0) -> (8, 20.8) projected
  line L1 (8, 0) -> (8, 20.8) projected
  line L2 (-0.1, 20.8) -> (3, 20.8) projected
  line L3 (3, 20.8) -> (6.1, 20.8) projected
  line L4 (6.1, 20.8) -> (3, 20.8) projected
  line L5 (3, 20.8) -> (-0.1, 20.8) projected
  line L6 (-34.3, 20.8) -> (-31.2, 20.8) projected
  line L7 (-31.2, 20.8) -> (-28.1, 20.8) projected
  line L8 (-28.1, 20.8) -> (-31.2, 20.8) projected
  line L9 (-31.2, 20.8) -> (-34.3, 20.8) projected
  line L10 (-36.2, 20.8) -> (8, 20.8) projected
  line L11 (8, 20.8) -> (-36.2, 20.8) projected
  line L12 (-32.8, 0) -> (-29.6, 0) projected
  line L13 (1.4, 0) -> (4.6, 0) projected
  line L14 (-26.2, 0) -> (-23.1, 0) projected
  line L15 (-23.1, 0) -> (-36.2, 0) projected
  line L16 (8, 0) -> (-36.2, 0) projected
  line L17 (0, 0) -> (8, 0) projected
  line L18 (0, 0) -> (-2, 0) projected
  line L19 (-2, 0) -> (-26.2, 0) projected
  point P0 (-20.1, 12.2)
  point P1 (7.1682, 0)
  point P2 (8, 5.1)
  point P3 (-4.7165, 20.8)
extrude "押し出し30" cut sketch "スケッチ30" against normal through all contours L0 L16 A2 | A2 L10 L2 L3 L0
sketch "スケッチ32" plane through (-9.3, -12.2, 16.1) normal (-1, 0, 0) x (0, 0, 1)
  arc A0 (-31.4835, 20.8) -> (-43.3682, 0) centre (-28.15, 5.1) ccw projected
  line L0 (-43.3682, 0) -> (0, 0) projected
  line L1 (0, 0) -> (0, 20.8) projected
  line L2 (-31.4835, 20.8) -> (0, 20.8) projected
  circle A1 centre (-28.15, 5.1) radius 5 projected
  line L3 (-17.6333, 12.2) -> (-17.6333, 18.8) projected
  line L4 (-22.2667, 12.2) -> (-17.6333, 12.2) projected
  line L5 (-22.2667, 12.2) -> (-22.2667, 18.8) projected
  line L6 (-22.2667, 18.8) -> (-17.6333, 18.8) projected
  line L7 (-25.2667, 12.2) -> (-25.2667, 18.8) projected
  line L8 (-28.4, 12.2) -> (-25.2667, 12.2) projected
  line L9 (-28.4, 12.2) -> (-28.4, 18.8) projected
  line L10 (-28.4, 18.8) -> (-25.2667, 18.8) projected
  line L11 (-14.6333, 18.8) -> (-11.5, 18.8) projected
  line L12 (-11.5, 12.2) -> (-11.5, 18.8) projected
  line L13 (-14.6333, 12.2) -> (-11.5, 12.2) projected
  line L14 (-14.6333, 12.2) -> (-14.6333, 18.8) projected
  line L15 (0, 20.8) -> (-7, 20.8)
  line L16 (-7, 20.8) -> (-7, 0)
  line L17 (-7, 0) -> (0, 0)
  line L18 (0, 0) -> (0, 20.8)
  point P0 (-16.1, 12.2)
  point P1 (-7, 20.8)
  dimension "d172" = 7
extrude "押し出し32" add sketch "スケッチ32" along normal blind 2 contours L2 L1 L0 L16
sketch "スケッチ33" plane through (-3.4, -1.6, 16.1) normal (0, 0, 1) x (1, 0, 0)
  circle A0 centre (-4.9, 7.2) radius 3
  circle A1 centre (-4.9, 7.2) radius 1.35
  line L0 (9, 10.2) -> (-7.9, 10.2) projected
  line L1 (-7.9, -10.6) -> (-7.9, 10.2) projected
  point P0 (3.4, 1.6)
  dimension "d175" = 2.7
  dimension "d176" = 6
extrude "押し出し33" cut sketch "スケッチ33" against normal up to surface (7 mm away) contours A1
chamfer "面取り2" distance 2 angle 45 1 edges at (-11.3, -1.8, 9.1)
sketch "スケッチ35" plane through (0, 0, 0) normal (0, 1, 0) x (1, 0, 0)
  line L0 (-26.8329, -47.9968) -> (35.8086, -47.9968)
  line L1 (35.8086, -47.9968) -> (35.8086, 46.6741)
  line L2 (35.8086, 46.6741) -> (-26.8329, 46.6741)
  line L3 (-26.8329, 46.6741) -> (-26.8329, -47.9968)
  point P0 (0, 0)
extrude "押し出し34" cut sketch "スケッチ35" against normal through all
sketch "スケッチ36" plane through (0, 6.6, 0) normal (0, -1, 0) x (1, 0, 0)
  circle A0 centre (-4.5, 0.9) radius 1 projected
  line L0 (-9.3, -1.5333) -> (-9.3, 1.4667) projected
  line L1 (-7.3, -1.5333) -> (-9.3, -1.5333) projected
  line L2 (-7.3, 1.4667) -> (-7.3, -1.5333) projected
  line L3 (-9.3, 1.4667) -> (-7.3, 1.4667) projected
  circle A1 centre (-4.5, -8.6) radius 1 projected
  line L4 (-7.3, -9.1667) -> (-9.3, -9.1667) projected
  line L5 (-7.3, -6.1667) -> (-7.3, -9.1667) projected
  line L6 (-9.3, -6.1667) -> (-7.3, -6.1667) projected
  line L7 (-9.3, -9.1667) -> (-9.3, -6.1667) projected
  point P0 (0, 0)
extrude "押し出し35" cut sketch "スケッチ36" along normal through all
equation "\"d21\" = d17"
equation "\"d54\" = d53"
equation "\"d55\" = d57"
equation "\"d56\" = d57"
equation "\"d158\" = d157"
properties part number "hand_motor_setter_base_upper"
